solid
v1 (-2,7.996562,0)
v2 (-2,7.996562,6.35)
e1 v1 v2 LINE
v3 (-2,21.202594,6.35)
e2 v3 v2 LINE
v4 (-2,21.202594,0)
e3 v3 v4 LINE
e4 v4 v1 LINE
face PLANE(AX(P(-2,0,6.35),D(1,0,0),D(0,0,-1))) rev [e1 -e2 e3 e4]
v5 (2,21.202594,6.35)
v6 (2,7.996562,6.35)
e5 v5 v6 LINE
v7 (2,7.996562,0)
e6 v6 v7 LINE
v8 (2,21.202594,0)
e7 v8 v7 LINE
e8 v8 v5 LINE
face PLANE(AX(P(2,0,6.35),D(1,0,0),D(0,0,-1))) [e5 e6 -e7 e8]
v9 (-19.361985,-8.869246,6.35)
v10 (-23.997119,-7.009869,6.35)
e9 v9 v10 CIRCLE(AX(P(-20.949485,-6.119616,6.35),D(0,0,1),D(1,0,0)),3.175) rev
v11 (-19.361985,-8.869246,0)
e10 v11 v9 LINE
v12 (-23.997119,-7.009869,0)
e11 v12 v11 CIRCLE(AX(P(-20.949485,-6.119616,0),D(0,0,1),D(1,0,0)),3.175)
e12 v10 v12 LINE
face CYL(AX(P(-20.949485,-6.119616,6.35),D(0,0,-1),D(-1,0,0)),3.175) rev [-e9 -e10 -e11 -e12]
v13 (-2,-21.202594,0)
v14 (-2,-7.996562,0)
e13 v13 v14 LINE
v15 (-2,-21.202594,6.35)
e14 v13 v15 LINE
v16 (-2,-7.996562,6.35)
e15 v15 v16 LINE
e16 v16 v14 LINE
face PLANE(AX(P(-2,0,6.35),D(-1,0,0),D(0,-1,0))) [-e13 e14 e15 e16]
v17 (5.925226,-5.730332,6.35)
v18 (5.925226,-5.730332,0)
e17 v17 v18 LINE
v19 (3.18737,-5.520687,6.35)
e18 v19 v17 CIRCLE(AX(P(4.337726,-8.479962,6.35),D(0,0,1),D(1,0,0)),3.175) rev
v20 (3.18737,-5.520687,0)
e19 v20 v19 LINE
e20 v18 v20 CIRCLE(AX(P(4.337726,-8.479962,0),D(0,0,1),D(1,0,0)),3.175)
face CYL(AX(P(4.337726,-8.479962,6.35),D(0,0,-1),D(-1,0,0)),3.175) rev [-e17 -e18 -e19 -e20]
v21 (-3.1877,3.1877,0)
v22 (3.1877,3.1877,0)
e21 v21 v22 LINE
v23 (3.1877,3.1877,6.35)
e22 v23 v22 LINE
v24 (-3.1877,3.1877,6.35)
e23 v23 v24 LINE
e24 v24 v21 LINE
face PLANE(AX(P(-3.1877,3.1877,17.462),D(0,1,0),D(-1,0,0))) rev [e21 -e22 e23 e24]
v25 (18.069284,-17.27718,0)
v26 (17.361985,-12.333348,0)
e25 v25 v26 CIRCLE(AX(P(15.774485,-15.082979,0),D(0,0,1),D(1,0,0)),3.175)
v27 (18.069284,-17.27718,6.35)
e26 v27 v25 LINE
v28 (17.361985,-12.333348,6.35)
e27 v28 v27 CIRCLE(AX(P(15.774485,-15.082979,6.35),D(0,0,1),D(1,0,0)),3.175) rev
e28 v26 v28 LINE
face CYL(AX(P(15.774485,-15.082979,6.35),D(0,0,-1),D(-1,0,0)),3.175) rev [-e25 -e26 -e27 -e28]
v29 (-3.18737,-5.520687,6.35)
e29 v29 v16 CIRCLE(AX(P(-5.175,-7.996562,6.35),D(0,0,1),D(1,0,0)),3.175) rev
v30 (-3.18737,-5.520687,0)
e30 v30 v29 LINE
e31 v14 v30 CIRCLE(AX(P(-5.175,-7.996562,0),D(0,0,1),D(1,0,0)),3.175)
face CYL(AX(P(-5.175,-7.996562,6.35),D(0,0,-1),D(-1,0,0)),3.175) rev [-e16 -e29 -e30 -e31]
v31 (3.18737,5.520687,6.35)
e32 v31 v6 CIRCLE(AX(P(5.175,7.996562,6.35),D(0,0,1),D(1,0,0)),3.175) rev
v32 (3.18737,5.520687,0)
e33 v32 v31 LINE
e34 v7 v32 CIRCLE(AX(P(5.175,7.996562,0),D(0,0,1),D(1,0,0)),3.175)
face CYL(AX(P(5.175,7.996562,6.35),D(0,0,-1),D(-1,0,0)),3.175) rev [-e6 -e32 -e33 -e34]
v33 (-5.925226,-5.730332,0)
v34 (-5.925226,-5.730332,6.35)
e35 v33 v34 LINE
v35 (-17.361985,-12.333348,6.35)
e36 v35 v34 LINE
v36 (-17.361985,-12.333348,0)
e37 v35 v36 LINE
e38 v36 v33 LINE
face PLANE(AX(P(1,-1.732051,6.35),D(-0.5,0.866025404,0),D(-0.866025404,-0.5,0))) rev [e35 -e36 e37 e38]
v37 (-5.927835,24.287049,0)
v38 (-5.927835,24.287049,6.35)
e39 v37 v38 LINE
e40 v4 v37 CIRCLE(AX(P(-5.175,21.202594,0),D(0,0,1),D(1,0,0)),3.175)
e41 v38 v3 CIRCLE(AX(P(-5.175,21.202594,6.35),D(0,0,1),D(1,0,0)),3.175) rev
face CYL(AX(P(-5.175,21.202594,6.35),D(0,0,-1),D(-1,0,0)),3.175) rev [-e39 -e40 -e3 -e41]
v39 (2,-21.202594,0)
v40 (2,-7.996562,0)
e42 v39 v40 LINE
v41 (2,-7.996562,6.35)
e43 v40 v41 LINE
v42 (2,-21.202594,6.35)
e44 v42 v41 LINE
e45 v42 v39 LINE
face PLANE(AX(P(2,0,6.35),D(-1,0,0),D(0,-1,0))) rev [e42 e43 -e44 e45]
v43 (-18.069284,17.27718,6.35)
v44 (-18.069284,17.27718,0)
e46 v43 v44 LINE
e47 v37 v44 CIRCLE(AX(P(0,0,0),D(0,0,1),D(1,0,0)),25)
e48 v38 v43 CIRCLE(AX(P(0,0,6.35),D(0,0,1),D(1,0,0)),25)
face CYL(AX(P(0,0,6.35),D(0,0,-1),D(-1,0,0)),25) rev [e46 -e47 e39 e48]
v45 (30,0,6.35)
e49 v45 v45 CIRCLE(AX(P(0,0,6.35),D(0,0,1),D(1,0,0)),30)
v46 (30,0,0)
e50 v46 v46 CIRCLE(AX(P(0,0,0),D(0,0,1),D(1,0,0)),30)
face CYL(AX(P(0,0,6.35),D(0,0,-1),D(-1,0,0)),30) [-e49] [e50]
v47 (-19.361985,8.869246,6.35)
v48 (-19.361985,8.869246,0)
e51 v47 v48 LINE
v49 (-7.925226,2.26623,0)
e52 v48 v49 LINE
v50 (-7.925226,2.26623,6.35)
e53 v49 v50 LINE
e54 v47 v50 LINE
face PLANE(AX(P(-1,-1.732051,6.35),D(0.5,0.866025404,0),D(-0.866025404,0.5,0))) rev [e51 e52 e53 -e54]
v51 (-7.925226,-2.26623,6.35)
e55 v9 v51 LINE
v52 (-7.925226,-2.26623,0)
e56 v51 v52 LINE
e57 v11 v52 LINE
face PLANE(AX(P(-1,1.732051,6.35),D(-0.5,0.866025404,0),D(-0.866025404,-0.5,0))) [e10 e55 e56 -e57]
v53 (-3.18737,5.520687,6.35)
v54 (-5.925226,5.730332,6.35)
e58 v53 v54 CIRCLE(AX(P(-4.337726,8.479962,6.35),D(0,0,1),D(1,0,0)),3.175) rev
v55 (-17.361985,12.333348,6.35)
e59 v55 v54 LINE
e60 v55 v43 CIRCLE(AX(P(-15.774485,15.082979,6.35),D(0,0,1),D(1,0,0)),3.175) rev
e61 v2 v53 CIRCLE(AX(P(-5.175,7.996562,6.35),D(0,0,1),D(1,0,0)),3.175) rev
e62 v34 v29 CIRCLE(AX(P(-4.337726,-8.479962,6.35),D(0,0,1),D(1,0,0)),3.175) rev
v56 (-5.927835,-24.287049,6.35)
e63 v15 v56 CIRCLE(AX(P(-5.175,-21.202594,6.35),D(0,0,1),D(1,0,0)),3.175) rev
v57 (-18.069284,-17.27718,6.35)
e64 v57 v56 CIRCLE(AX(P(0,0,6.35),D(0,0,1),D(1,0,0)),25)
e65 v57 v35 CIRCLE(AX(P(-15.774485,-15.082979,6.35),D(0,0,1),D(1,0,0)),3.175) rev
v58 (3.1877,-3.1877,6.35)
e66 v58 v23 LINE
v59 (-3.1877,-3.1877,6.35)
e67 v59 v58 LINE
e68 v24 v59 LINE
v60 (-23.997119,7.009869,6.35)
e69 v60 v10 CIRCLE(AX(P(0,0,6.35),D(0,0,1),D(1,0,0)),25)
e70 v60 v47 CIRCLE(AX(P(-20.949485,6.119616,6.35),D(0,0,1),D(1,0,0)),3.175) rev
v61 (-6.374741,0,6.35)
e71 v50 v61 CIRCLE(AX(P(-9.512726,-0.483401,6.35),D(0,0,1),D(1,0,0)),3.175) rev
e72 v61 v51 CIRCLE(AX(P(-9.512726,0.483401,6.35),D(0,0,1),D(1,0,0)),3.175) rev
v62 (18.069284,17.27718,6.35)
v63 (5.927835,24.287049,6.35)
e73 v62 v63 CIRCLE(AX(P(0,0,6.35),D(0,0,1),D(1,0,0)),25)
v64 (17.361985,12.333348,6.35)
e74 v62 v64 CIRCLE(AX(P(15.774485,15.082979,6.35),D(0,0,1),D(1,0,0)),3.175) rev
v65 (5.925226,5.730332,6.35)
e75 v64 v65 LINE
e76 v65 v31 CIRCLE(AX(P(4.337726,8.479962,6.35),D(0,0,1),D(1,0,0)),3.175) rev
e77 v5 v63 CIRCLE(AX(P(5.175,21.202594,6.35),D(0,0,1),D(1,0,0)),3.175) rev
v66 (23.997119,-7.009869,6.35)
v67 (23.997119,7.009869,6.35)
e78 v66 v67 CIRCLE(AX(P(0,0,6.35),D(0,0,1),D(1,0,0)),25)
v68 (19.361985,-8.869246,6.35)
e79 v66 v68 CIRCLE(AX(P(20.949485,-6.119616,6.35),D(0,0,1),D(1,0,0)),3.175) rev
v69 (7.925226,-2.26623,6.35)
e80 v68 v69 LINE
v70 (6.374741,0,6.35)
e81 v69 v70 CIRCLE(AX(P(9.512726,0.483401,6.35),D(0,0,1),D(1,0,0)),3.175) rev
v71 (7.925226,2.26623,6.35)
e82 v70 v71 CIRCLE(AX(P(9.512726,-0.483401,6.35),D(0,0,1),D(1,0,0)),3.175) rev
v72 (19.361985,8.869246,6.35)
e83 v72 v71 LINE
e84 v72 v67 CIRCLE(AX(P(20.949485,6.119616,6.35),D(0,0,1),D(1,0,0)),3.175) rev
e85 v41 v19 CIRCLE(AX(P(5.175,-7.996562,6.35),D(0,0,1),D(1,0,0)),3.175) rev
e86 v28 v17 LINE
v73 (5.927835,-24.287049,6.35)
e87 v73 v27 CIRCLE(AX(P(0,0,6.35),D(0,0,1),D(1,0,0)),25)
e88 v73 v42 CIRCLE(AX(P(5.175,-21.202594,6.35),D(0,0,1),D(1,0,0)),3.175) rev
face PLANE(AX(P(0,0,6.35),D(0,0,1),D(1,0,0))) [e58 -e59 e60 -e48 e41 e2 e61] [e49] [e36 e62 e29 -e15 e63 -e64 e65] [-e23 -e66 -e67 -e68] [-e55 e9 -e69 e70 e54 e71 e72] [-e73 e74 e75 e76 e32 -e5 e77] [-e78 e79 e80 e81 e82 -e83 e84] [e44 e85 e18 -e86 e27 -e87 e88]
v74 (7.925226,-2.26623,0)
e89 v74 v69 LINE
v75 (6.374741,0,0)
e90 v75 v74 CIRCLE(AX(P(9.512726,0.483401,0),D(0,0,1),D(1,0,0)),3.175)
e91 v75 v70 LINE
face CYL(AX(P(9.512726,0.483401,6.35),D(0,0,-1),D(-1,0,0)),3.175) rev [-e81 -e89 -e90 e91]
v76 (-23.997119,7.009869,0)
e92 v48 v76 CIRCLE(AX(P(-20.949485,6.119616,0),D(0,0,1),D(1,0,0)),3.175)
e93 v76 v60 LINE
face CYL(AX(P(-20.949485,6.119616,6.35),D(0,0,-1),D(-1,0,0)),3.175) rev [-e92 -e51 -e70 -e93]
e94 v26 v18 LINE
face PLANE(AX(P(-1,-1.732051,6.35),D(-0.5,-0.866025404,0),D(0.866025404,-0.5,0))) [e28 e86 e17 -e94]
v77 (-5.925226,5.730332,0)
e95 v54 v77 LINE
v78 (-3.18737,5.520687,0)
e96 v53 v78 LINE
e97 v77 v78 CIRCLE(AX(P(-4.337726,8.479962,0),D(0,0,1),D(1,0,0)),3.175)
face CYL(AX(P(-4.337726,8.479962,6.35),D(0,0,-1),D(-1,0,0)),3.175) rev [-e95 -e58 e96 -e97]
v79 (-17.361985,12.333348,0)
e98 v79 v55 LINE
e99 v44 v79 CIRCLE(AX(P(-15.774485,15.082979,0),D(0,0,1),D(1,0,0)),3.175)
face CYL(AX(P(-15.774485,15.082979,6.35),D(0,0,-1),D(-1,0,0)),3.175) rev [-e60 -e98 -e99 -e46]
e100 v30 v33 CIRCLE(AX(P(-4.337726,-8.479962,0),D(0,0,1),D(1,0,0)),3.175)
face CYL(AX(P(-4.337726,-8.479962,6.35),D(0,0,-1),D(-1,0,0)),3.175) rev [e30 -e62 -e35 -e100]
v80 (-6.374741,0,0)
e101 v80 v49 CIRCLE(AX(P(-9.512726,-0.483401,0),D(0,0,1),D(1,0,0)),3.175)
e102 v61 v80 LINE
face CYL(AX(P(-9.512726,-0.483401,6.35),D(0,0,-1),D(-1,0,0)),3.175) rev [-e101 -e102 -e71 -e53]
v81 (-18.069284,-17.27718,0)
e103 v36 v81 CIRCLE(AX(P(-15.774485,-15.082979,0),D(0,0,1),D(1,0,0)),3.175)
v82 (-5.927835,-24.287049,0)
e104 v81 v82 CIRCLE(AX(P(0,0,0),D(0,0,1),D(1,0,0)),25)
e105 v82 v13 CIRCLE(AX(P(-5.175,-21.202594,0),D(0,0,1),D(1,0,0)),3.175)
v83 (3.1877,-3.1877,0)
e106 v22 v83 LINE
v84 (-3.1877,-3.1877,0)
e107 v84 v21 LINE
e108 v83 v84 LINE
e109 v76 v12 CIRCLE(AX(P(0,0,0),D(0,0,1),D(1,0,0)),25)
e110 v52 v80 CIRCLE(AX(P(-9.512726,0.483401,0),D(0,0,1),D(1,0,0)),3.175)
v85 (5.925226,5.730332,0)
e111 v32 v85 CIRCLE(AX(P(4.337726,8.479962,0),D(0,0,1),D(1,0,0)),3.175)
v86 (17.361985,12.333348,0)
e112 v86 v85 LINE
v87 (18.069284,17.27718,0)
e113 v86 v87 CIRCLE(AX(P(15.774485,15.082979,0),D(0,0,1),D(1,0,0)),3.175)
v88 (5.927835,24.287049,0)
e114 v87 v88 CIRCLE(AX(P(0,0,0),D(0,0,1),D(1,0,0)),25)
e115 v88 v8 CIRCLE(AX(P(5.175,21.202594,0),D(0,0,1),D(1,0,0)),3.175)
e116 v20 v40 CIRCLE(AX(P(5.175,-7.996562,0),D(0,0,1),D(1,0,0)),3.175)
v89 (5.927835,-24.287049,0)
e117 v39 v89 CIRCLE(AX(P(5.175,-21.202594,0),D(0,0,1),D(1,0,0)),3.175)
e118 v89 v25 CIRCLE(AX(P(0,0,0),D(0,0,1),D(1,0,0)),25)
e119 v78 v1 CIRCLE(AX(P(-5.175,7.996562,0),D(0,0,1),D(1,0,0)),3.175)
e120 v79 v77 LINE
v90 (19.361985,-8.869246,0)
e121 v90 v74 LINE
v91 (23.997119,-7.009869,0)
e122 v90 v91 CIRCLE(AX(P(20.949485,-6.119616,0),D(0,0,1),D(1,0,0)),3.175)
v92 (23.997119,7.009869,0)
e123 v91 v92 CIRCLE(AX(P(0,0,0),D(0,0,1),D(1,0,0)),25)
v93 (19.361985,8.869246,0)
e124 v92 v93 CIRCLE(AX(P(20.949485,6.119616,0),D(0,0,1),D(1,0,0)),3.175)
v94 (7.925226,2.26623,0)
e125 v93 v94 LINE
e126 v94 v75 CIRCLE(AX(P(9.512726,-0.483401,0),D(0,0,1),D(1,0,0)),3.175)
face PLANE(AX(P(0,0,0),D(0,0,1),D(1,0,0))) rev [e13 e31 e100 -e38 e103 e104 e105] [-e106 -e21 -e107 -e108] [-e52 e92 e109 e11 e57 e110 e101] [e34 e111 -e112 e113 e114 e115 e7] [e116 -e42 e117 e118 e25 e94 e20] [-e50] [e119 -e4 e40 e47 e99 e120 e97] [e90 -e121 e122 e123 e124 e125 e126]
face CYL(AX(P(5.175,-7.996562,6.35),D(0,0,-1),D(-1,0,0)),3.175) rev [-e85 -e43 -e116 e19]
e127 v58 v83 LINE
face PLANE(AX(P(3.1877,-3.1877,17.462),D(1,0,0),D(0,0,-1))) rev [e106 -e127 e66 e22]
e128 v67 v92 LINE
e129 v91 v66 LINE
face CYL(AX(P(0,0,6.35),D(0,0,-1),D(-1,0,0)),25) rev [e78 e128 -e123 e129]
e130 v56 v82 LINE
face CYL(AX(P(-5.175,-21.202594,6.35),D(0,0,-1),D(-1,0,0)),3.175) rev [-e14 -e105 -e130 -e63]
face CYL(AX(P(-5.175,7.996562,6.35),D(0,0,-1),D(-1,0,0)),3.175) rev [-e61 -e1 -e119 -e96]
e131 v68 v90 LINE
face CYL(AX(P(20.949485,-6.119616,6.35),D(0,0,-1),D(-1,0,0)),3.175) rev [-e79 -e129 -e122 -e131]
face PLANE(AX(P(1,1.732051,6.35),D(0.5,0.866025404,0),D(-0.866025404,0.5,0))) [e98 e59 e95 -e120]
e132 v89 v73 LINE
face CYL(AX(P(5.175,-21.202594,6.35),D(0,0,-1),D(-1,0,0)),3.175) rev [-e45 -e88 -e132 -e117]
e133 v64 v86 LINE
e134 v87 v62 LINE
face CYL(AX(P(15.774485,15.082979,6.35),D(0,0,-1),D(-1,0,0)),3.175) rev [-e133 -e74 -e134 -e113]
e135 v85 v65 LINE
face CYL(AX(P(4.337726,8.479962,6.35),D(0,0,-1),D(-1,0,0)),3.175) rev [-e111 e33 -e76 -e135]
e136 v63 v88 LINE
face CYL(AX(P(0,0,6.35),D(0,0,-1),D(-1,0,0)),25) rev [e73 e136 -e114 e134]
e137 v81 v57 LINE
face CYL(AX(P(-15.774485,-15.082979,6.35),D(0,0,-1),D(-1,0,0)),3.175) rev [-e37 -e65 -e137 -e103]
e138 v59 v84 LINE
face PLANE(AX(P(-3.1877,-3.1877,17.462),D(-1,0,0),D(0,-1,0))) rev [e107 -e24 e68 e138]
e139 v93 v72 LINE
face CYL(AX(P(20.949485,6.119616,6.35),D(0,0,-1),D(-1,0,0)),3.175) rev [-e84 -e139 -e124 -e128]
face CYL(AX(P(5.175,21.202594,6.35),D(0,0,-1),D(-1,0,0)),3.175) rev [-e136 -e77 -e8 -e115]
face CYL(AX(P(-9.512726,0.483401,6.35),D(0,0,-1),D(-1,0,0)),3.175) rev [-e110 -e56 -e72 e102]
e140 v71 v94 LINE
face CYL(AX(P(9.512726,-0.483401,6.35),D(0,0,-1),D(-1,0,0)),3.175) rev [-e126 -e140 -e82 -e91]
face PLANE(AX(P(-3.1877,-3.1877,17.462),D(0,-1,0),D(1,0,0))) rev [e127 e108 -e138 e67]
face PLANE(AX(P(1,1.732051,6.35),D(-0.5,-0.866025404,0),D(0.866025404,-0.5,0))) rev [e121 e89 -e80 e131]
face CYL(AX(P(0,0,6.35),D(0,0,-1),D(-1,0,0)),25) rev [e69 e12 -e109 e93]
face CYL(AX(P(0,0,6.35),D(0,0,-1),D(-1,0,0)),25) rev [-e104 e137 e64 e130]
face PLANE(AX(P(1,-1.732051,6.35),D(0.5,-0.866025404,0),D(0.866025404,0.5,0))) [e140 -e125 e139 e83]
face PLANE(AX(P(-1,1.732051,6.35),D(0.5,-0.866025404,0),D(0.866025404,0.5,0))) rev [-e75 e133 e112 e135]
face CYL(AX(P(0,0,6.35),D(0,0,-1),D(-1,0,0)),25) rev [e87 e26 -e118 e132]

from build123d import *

# Parameters (mm, degrees)
SKETCH1_R           = 30
BOSS_EXTRUDE1_DEPTH = 6.35
FILLET1_R           = 3.175
SKETCH2_W           = 6.3754
SKETCH2_H           = 6.3754
CUT_EXTRUDE1_DEPTH  = 17.462


with BuildPart() as part:
    # Sketch1 → Boss-Extrude1 (new body)
    with BuildSketch(Plane.XY):
        Circle(SKETCH1_R)
        with BuildLine():
            Line((-2, 24.919871589), (-2, 6.026815079))
            ThreePointArc((-2, 6.026815079), (-3.175, 5.499261314), (-4.219374963, 4.745458347))
            Line((-4.219374963, 4.745458347), (-20.581241855, 14.191986602))
            ThreePointArc((-20.581241855, 14.191986602), (-12.5, 21.650635095), (-2, 24.919871589))
        make_face(mode=Mode.SUBTRACT)
        with BuildLine():
            Line((-22.581241855, 10.727884987), (-6.219374963, 1.281356732))
            ThreePointArc((-6.219374963, 1.281356732), (-6.35, 0), (-6.219374963, -1.281356732))
            Line((-6.219374963, -1.281356732), (-22.581241855, -10.727884987))
            ThreePointArc((-22.581241855, -10.727884987), (-25, 0), (-22.581241855, 10.727884987))
        make_face(mode=Mode.SUBTRACT)
        with BuildLine():
            Line((-20.581241855, -14.191986602), (-4.219374963, -4.745458347))
            ThreePointArc((-4.219374963, -4.745458347), (-3.175, -5.499261314), (-2, -6.026815079))
            Line((-2, -6.026815079), (-2, -24.919871589))
            ThreePointArc((-2, -24.919871589), (-12.5, -21.650635095), (-20.581241855, -14.191986602))
        make_face(mode=Mode.SUBTRACT)
        with BuildLine():
            Line((2, -24.919871589), (2, -6.026815079))
            ThreePointArc((2, -6.026815079), (3.175, -5.499261314), (4.219374963, -4.745458347))
            Line((4.219374963, -4.745458347), (20.581241855, -14.191986602))
            ThreePointArc((20.581241855, -14.191986602), (12.5, -21.650635095), (2, -24.919871589))
        make_face(mode=Mode.SUBTRACT)
        with BuildLine():
            Line((22.581241855, -10.727884987), (6.219374963, -1.281356732))
            ThreePointArc((6.219374963, -1.281356732), (6.35, 0), (6.219374963, 1.281356732))
            Line((6.219374963, 1.281356732), (22.581241855, 10.727884987))
            ThreePointArc((22.581241855, 10.727884987), (25, 0), (22.581241855, -10.727884987))
        make_face(mode=Mode.SUBTRACT)
        with BuildLine():
            Line((20.581241855, 14.191986602), (4.219374963, 4.745458347))
            ThreePointArc((4.219374963, 4.745458347), (3.175, 5.499261314), (2, 6.026815079))
            Line((2, 6.026815079), (2, 24.919871589))
            ThreePointArc((2, 24.919871589), (12.5, 21.650635095), (20.581241855, 14.191986602))
        make_face(mode=Mode.SUBTRACT)
    extrude(amount=BOSS_EXTRUDE1_DEPTH)

    # Fillet1
    # the kernel refuses this fillet: 3.175 mm, written as the material it adds along each edge
    with BuildSketch(Plane(origin=(-22.581241855, -10.727884987, 0), x_dir=(-0.3558834781816715, 0.9345303365634076, 0), z_dir=(0, 0, 1)), Plane(origin=(22.581241855, 10.727884987, 0), x_dir=(0.3558834781815518, -0.9345303365634531, 0), z_dir=(0, 0, 1)), Plane(origin=(-20.581241855, 14.191986602, 0), x_dir=(0.63138527298033, 0.7754693011741691, 0), z_dir=(0, 0, 1))) as fillet1_piece_1:
        with BuildLine():
            CenterArc((3.725852278, -3.164933037), FILLET1_R, 85.436166165, 103.716233406)
            Line((0.591273993, -3.669951824), (0, 0))
            ThreePointArc((0, 0), (1.989243074, 0.079267427), (3.978486149, 0))
        make_face()
    extrude(amount=6.35)
    with BuildSketch(Plane(origin=(-22.581241855, 10.727884987, 0), x_dir=(-0.3558834781816212, -0.9345303365634268, 0), z_dir=(0, 0, 1)), Plane(origin=(2, -24.919871589, 0), x_dir=(0.987268751161949, 0.1590610353893298, 0), z_dir=(0, 0, 1)), Plane(origin=(22.581241855, -10.727884987, 0), x_dir=(0.35588347818151106, 0.9345303365634686, 0), z_dir=(0, 0, 1)), Plane(origin=(-2, 24.919871589, 0), x_dir=(-0.9872687511619511, -0.15906103538931676, 0), z_dir=(0, 0, 1))) as fillet1_piece_2:
        with BuildLine():
            CenterArc((3.725852278, 3.164933037), FILLET1_R, 170.847600429, 103.716233406)
            Line((0.591273993, 3.669951824), (0, 0))
            ThreePointArc((0, 0), (1.989243074, -0.079267427), (3.978486149, 0))
        make_face()
    extrude(amount=6.35)
    with BuildSketch(Plane(origin=(-20.581241855, -14.191986602, 0), x_dir=(0.8660254037844406, 0.49999999999999667, 0), z_dir=(0, 0, 1)), Plane(origin=(20.581241855, 14.191986602, 0), x_dir=(-0.8660254037844309, -0.5000000000000133, 0), z_dir=(0, 0, 1))) as fillet1_piece_3:
        with BuildLine():
            CenterArc((3.717277408, -3.175), FILLET1_R, 90, 103.716233406)
            ThreePointArc((0.632822126, -3.927835052), (0.23815281, -1.976525885), (0, 0))
            Line((0, 0), (3.717277408, 0))
        make_face()
    extrude(amount=6.35)
    with BuildSketch(Plane(origin=(-2, -24.919871589, 0), x_dir=(0, 1, 0), z_dir=(0, 0, 1)), Plane(origin=(20.581241855, -14.191986602, 0), x_dir=(-0.8660254037844468, 0.49999999999998584, 0), z_dir=(0, 0, 1)), Plane(origin=(2, 24.919871589, 0), x_dir=(0, -1, 0), z_dir=(0, 0, 1))) as fillet1_piece_4:
        with BuildLine():
            CenterArc((3.717277408, 3.175), FILLET1_R, 166.283766594, 103.716233406)
            ThreePointArc((0.632822126, 3.927835052), (0.23815281, 1.976525885), (0, 0))
            Line((0, 0), (3.717277408, 0))
        make_face()
    extrude(amount=6.35)
    with BuildSketch(Plane(origin=(4.219374963, 4.745458347, 0), x_dir=(0.8660254037844292, 0.5000000000000164, 0), z_dir=(0, 0, 1)), Plane(origin=(6.219374963, -1.281356732, 0), x_dir=(0.8660254037845205, -0.4999999999998582, 0), z_dir=(0, 0, 1)), Plane(origin=(2, -6.026815079, 0), x_dir=(0, -1, 0), z_dir=(0, 0, 1)), Plane(origin=(-2, 6.026815079, 0), x_dir=(0, 1, 0), z_dir=(0, 0, 1)), Plane(origin=(-6.219374963, 1.281356732, 0), x_dir=(-0.866025403784444, 0.49999999999999056, 0), z_dir=(0, 0, 1)), Plane(origin=(-4.219374963, -4.745458347, 0), x_dir=(-0.8660254037844402, -0.49999999999999745, 0), z_dir=(0, 0, 1))) as fillet1_piece_5:
        with BuildLine():
            CenterArc((1.969746682, 3.175), FILLET1_R, 212.909051607, 57.090948393)
            ThreePointArc((-0.695773905, 1.45), (-0.301795458, 0.747116731), (0, 0))
            Line((0, 0), (1.969746682, 0))
        make_face()
    extrude(amount=6.35)
    with BuildSketch(Plane(origin=(2, 6.026815079, 0), x_dir=(0.9015778931723624, -0.43261680797546975, 0), z_dir=(0, 0, 1)), Plane(origin=(6.219374963, 1.281356732, 0), x_dir=(0.07613180077529093, -0.9970977629654534, 0), z_dir=(0, 0, 1)), Plane(origin=(-4.219374963, 4.745458347, 0), x_dir=(0.8254460923970771, 0.5644809549899766, 0), z_dir=(0, 0, 1)), Plane(origin=(-6.219374963, -1.281356732, 0), x_dir=(-0.07613180077550848, 0.9970977629654367, 0), z_dir=(0, 0, 1)), Plane(origin=(-2, -6.026815079, 0), x_dir=(-0.9015778931724164, 0.432616807975357, 0), z_dir=(0, 0, 1))) as fillet1_piece_6:
        with BuildLine():
            CenterArc((2.010364289, 3.149438429), FILLET1_R, 205.633744341, 57.090948393)
            Line((-0.852145522, 1.775880064), (0, 0))
            ThreePointArc((0, 0), (0.804145716, 0.051123142), (1.608291431, 0))
        make_face()
    extrude(amount=6.35)
    with BuildSketch(Plane(origin=(4.219374963, -4.745458347, 0), x_dir=(0.8660254037844309, -0.5000000000000133, 0), z_dir=(0, 0, 1))) as fillet1_piece_7:
        with BuildLine():
            CenterArc((1.969746682, -3.175), FILLET1_R, 90, 57.090948393)
            ThreePointArc((-0.695773905, -1.45), (-0.301795458, -0.747116731), (0, 0))
            Line((0, 0), (1.969746682, 0))
        make_face()
    extrude(amount=6.35)

    # Sketch2 → Cut-Extrude1 (cut)
    with BuildSketch(Plane(origin=(0, 0, 0), x_dir=(-1, 0, 0), z_dir=(0, 0, -1))):
        Rectangle(SKETCH2_W, SKETCH2_H)
    extrude(amount=-CUT_EXTRUDE1_DEPTH, mode=Mode.SUBTRACT)


solid = part.part
